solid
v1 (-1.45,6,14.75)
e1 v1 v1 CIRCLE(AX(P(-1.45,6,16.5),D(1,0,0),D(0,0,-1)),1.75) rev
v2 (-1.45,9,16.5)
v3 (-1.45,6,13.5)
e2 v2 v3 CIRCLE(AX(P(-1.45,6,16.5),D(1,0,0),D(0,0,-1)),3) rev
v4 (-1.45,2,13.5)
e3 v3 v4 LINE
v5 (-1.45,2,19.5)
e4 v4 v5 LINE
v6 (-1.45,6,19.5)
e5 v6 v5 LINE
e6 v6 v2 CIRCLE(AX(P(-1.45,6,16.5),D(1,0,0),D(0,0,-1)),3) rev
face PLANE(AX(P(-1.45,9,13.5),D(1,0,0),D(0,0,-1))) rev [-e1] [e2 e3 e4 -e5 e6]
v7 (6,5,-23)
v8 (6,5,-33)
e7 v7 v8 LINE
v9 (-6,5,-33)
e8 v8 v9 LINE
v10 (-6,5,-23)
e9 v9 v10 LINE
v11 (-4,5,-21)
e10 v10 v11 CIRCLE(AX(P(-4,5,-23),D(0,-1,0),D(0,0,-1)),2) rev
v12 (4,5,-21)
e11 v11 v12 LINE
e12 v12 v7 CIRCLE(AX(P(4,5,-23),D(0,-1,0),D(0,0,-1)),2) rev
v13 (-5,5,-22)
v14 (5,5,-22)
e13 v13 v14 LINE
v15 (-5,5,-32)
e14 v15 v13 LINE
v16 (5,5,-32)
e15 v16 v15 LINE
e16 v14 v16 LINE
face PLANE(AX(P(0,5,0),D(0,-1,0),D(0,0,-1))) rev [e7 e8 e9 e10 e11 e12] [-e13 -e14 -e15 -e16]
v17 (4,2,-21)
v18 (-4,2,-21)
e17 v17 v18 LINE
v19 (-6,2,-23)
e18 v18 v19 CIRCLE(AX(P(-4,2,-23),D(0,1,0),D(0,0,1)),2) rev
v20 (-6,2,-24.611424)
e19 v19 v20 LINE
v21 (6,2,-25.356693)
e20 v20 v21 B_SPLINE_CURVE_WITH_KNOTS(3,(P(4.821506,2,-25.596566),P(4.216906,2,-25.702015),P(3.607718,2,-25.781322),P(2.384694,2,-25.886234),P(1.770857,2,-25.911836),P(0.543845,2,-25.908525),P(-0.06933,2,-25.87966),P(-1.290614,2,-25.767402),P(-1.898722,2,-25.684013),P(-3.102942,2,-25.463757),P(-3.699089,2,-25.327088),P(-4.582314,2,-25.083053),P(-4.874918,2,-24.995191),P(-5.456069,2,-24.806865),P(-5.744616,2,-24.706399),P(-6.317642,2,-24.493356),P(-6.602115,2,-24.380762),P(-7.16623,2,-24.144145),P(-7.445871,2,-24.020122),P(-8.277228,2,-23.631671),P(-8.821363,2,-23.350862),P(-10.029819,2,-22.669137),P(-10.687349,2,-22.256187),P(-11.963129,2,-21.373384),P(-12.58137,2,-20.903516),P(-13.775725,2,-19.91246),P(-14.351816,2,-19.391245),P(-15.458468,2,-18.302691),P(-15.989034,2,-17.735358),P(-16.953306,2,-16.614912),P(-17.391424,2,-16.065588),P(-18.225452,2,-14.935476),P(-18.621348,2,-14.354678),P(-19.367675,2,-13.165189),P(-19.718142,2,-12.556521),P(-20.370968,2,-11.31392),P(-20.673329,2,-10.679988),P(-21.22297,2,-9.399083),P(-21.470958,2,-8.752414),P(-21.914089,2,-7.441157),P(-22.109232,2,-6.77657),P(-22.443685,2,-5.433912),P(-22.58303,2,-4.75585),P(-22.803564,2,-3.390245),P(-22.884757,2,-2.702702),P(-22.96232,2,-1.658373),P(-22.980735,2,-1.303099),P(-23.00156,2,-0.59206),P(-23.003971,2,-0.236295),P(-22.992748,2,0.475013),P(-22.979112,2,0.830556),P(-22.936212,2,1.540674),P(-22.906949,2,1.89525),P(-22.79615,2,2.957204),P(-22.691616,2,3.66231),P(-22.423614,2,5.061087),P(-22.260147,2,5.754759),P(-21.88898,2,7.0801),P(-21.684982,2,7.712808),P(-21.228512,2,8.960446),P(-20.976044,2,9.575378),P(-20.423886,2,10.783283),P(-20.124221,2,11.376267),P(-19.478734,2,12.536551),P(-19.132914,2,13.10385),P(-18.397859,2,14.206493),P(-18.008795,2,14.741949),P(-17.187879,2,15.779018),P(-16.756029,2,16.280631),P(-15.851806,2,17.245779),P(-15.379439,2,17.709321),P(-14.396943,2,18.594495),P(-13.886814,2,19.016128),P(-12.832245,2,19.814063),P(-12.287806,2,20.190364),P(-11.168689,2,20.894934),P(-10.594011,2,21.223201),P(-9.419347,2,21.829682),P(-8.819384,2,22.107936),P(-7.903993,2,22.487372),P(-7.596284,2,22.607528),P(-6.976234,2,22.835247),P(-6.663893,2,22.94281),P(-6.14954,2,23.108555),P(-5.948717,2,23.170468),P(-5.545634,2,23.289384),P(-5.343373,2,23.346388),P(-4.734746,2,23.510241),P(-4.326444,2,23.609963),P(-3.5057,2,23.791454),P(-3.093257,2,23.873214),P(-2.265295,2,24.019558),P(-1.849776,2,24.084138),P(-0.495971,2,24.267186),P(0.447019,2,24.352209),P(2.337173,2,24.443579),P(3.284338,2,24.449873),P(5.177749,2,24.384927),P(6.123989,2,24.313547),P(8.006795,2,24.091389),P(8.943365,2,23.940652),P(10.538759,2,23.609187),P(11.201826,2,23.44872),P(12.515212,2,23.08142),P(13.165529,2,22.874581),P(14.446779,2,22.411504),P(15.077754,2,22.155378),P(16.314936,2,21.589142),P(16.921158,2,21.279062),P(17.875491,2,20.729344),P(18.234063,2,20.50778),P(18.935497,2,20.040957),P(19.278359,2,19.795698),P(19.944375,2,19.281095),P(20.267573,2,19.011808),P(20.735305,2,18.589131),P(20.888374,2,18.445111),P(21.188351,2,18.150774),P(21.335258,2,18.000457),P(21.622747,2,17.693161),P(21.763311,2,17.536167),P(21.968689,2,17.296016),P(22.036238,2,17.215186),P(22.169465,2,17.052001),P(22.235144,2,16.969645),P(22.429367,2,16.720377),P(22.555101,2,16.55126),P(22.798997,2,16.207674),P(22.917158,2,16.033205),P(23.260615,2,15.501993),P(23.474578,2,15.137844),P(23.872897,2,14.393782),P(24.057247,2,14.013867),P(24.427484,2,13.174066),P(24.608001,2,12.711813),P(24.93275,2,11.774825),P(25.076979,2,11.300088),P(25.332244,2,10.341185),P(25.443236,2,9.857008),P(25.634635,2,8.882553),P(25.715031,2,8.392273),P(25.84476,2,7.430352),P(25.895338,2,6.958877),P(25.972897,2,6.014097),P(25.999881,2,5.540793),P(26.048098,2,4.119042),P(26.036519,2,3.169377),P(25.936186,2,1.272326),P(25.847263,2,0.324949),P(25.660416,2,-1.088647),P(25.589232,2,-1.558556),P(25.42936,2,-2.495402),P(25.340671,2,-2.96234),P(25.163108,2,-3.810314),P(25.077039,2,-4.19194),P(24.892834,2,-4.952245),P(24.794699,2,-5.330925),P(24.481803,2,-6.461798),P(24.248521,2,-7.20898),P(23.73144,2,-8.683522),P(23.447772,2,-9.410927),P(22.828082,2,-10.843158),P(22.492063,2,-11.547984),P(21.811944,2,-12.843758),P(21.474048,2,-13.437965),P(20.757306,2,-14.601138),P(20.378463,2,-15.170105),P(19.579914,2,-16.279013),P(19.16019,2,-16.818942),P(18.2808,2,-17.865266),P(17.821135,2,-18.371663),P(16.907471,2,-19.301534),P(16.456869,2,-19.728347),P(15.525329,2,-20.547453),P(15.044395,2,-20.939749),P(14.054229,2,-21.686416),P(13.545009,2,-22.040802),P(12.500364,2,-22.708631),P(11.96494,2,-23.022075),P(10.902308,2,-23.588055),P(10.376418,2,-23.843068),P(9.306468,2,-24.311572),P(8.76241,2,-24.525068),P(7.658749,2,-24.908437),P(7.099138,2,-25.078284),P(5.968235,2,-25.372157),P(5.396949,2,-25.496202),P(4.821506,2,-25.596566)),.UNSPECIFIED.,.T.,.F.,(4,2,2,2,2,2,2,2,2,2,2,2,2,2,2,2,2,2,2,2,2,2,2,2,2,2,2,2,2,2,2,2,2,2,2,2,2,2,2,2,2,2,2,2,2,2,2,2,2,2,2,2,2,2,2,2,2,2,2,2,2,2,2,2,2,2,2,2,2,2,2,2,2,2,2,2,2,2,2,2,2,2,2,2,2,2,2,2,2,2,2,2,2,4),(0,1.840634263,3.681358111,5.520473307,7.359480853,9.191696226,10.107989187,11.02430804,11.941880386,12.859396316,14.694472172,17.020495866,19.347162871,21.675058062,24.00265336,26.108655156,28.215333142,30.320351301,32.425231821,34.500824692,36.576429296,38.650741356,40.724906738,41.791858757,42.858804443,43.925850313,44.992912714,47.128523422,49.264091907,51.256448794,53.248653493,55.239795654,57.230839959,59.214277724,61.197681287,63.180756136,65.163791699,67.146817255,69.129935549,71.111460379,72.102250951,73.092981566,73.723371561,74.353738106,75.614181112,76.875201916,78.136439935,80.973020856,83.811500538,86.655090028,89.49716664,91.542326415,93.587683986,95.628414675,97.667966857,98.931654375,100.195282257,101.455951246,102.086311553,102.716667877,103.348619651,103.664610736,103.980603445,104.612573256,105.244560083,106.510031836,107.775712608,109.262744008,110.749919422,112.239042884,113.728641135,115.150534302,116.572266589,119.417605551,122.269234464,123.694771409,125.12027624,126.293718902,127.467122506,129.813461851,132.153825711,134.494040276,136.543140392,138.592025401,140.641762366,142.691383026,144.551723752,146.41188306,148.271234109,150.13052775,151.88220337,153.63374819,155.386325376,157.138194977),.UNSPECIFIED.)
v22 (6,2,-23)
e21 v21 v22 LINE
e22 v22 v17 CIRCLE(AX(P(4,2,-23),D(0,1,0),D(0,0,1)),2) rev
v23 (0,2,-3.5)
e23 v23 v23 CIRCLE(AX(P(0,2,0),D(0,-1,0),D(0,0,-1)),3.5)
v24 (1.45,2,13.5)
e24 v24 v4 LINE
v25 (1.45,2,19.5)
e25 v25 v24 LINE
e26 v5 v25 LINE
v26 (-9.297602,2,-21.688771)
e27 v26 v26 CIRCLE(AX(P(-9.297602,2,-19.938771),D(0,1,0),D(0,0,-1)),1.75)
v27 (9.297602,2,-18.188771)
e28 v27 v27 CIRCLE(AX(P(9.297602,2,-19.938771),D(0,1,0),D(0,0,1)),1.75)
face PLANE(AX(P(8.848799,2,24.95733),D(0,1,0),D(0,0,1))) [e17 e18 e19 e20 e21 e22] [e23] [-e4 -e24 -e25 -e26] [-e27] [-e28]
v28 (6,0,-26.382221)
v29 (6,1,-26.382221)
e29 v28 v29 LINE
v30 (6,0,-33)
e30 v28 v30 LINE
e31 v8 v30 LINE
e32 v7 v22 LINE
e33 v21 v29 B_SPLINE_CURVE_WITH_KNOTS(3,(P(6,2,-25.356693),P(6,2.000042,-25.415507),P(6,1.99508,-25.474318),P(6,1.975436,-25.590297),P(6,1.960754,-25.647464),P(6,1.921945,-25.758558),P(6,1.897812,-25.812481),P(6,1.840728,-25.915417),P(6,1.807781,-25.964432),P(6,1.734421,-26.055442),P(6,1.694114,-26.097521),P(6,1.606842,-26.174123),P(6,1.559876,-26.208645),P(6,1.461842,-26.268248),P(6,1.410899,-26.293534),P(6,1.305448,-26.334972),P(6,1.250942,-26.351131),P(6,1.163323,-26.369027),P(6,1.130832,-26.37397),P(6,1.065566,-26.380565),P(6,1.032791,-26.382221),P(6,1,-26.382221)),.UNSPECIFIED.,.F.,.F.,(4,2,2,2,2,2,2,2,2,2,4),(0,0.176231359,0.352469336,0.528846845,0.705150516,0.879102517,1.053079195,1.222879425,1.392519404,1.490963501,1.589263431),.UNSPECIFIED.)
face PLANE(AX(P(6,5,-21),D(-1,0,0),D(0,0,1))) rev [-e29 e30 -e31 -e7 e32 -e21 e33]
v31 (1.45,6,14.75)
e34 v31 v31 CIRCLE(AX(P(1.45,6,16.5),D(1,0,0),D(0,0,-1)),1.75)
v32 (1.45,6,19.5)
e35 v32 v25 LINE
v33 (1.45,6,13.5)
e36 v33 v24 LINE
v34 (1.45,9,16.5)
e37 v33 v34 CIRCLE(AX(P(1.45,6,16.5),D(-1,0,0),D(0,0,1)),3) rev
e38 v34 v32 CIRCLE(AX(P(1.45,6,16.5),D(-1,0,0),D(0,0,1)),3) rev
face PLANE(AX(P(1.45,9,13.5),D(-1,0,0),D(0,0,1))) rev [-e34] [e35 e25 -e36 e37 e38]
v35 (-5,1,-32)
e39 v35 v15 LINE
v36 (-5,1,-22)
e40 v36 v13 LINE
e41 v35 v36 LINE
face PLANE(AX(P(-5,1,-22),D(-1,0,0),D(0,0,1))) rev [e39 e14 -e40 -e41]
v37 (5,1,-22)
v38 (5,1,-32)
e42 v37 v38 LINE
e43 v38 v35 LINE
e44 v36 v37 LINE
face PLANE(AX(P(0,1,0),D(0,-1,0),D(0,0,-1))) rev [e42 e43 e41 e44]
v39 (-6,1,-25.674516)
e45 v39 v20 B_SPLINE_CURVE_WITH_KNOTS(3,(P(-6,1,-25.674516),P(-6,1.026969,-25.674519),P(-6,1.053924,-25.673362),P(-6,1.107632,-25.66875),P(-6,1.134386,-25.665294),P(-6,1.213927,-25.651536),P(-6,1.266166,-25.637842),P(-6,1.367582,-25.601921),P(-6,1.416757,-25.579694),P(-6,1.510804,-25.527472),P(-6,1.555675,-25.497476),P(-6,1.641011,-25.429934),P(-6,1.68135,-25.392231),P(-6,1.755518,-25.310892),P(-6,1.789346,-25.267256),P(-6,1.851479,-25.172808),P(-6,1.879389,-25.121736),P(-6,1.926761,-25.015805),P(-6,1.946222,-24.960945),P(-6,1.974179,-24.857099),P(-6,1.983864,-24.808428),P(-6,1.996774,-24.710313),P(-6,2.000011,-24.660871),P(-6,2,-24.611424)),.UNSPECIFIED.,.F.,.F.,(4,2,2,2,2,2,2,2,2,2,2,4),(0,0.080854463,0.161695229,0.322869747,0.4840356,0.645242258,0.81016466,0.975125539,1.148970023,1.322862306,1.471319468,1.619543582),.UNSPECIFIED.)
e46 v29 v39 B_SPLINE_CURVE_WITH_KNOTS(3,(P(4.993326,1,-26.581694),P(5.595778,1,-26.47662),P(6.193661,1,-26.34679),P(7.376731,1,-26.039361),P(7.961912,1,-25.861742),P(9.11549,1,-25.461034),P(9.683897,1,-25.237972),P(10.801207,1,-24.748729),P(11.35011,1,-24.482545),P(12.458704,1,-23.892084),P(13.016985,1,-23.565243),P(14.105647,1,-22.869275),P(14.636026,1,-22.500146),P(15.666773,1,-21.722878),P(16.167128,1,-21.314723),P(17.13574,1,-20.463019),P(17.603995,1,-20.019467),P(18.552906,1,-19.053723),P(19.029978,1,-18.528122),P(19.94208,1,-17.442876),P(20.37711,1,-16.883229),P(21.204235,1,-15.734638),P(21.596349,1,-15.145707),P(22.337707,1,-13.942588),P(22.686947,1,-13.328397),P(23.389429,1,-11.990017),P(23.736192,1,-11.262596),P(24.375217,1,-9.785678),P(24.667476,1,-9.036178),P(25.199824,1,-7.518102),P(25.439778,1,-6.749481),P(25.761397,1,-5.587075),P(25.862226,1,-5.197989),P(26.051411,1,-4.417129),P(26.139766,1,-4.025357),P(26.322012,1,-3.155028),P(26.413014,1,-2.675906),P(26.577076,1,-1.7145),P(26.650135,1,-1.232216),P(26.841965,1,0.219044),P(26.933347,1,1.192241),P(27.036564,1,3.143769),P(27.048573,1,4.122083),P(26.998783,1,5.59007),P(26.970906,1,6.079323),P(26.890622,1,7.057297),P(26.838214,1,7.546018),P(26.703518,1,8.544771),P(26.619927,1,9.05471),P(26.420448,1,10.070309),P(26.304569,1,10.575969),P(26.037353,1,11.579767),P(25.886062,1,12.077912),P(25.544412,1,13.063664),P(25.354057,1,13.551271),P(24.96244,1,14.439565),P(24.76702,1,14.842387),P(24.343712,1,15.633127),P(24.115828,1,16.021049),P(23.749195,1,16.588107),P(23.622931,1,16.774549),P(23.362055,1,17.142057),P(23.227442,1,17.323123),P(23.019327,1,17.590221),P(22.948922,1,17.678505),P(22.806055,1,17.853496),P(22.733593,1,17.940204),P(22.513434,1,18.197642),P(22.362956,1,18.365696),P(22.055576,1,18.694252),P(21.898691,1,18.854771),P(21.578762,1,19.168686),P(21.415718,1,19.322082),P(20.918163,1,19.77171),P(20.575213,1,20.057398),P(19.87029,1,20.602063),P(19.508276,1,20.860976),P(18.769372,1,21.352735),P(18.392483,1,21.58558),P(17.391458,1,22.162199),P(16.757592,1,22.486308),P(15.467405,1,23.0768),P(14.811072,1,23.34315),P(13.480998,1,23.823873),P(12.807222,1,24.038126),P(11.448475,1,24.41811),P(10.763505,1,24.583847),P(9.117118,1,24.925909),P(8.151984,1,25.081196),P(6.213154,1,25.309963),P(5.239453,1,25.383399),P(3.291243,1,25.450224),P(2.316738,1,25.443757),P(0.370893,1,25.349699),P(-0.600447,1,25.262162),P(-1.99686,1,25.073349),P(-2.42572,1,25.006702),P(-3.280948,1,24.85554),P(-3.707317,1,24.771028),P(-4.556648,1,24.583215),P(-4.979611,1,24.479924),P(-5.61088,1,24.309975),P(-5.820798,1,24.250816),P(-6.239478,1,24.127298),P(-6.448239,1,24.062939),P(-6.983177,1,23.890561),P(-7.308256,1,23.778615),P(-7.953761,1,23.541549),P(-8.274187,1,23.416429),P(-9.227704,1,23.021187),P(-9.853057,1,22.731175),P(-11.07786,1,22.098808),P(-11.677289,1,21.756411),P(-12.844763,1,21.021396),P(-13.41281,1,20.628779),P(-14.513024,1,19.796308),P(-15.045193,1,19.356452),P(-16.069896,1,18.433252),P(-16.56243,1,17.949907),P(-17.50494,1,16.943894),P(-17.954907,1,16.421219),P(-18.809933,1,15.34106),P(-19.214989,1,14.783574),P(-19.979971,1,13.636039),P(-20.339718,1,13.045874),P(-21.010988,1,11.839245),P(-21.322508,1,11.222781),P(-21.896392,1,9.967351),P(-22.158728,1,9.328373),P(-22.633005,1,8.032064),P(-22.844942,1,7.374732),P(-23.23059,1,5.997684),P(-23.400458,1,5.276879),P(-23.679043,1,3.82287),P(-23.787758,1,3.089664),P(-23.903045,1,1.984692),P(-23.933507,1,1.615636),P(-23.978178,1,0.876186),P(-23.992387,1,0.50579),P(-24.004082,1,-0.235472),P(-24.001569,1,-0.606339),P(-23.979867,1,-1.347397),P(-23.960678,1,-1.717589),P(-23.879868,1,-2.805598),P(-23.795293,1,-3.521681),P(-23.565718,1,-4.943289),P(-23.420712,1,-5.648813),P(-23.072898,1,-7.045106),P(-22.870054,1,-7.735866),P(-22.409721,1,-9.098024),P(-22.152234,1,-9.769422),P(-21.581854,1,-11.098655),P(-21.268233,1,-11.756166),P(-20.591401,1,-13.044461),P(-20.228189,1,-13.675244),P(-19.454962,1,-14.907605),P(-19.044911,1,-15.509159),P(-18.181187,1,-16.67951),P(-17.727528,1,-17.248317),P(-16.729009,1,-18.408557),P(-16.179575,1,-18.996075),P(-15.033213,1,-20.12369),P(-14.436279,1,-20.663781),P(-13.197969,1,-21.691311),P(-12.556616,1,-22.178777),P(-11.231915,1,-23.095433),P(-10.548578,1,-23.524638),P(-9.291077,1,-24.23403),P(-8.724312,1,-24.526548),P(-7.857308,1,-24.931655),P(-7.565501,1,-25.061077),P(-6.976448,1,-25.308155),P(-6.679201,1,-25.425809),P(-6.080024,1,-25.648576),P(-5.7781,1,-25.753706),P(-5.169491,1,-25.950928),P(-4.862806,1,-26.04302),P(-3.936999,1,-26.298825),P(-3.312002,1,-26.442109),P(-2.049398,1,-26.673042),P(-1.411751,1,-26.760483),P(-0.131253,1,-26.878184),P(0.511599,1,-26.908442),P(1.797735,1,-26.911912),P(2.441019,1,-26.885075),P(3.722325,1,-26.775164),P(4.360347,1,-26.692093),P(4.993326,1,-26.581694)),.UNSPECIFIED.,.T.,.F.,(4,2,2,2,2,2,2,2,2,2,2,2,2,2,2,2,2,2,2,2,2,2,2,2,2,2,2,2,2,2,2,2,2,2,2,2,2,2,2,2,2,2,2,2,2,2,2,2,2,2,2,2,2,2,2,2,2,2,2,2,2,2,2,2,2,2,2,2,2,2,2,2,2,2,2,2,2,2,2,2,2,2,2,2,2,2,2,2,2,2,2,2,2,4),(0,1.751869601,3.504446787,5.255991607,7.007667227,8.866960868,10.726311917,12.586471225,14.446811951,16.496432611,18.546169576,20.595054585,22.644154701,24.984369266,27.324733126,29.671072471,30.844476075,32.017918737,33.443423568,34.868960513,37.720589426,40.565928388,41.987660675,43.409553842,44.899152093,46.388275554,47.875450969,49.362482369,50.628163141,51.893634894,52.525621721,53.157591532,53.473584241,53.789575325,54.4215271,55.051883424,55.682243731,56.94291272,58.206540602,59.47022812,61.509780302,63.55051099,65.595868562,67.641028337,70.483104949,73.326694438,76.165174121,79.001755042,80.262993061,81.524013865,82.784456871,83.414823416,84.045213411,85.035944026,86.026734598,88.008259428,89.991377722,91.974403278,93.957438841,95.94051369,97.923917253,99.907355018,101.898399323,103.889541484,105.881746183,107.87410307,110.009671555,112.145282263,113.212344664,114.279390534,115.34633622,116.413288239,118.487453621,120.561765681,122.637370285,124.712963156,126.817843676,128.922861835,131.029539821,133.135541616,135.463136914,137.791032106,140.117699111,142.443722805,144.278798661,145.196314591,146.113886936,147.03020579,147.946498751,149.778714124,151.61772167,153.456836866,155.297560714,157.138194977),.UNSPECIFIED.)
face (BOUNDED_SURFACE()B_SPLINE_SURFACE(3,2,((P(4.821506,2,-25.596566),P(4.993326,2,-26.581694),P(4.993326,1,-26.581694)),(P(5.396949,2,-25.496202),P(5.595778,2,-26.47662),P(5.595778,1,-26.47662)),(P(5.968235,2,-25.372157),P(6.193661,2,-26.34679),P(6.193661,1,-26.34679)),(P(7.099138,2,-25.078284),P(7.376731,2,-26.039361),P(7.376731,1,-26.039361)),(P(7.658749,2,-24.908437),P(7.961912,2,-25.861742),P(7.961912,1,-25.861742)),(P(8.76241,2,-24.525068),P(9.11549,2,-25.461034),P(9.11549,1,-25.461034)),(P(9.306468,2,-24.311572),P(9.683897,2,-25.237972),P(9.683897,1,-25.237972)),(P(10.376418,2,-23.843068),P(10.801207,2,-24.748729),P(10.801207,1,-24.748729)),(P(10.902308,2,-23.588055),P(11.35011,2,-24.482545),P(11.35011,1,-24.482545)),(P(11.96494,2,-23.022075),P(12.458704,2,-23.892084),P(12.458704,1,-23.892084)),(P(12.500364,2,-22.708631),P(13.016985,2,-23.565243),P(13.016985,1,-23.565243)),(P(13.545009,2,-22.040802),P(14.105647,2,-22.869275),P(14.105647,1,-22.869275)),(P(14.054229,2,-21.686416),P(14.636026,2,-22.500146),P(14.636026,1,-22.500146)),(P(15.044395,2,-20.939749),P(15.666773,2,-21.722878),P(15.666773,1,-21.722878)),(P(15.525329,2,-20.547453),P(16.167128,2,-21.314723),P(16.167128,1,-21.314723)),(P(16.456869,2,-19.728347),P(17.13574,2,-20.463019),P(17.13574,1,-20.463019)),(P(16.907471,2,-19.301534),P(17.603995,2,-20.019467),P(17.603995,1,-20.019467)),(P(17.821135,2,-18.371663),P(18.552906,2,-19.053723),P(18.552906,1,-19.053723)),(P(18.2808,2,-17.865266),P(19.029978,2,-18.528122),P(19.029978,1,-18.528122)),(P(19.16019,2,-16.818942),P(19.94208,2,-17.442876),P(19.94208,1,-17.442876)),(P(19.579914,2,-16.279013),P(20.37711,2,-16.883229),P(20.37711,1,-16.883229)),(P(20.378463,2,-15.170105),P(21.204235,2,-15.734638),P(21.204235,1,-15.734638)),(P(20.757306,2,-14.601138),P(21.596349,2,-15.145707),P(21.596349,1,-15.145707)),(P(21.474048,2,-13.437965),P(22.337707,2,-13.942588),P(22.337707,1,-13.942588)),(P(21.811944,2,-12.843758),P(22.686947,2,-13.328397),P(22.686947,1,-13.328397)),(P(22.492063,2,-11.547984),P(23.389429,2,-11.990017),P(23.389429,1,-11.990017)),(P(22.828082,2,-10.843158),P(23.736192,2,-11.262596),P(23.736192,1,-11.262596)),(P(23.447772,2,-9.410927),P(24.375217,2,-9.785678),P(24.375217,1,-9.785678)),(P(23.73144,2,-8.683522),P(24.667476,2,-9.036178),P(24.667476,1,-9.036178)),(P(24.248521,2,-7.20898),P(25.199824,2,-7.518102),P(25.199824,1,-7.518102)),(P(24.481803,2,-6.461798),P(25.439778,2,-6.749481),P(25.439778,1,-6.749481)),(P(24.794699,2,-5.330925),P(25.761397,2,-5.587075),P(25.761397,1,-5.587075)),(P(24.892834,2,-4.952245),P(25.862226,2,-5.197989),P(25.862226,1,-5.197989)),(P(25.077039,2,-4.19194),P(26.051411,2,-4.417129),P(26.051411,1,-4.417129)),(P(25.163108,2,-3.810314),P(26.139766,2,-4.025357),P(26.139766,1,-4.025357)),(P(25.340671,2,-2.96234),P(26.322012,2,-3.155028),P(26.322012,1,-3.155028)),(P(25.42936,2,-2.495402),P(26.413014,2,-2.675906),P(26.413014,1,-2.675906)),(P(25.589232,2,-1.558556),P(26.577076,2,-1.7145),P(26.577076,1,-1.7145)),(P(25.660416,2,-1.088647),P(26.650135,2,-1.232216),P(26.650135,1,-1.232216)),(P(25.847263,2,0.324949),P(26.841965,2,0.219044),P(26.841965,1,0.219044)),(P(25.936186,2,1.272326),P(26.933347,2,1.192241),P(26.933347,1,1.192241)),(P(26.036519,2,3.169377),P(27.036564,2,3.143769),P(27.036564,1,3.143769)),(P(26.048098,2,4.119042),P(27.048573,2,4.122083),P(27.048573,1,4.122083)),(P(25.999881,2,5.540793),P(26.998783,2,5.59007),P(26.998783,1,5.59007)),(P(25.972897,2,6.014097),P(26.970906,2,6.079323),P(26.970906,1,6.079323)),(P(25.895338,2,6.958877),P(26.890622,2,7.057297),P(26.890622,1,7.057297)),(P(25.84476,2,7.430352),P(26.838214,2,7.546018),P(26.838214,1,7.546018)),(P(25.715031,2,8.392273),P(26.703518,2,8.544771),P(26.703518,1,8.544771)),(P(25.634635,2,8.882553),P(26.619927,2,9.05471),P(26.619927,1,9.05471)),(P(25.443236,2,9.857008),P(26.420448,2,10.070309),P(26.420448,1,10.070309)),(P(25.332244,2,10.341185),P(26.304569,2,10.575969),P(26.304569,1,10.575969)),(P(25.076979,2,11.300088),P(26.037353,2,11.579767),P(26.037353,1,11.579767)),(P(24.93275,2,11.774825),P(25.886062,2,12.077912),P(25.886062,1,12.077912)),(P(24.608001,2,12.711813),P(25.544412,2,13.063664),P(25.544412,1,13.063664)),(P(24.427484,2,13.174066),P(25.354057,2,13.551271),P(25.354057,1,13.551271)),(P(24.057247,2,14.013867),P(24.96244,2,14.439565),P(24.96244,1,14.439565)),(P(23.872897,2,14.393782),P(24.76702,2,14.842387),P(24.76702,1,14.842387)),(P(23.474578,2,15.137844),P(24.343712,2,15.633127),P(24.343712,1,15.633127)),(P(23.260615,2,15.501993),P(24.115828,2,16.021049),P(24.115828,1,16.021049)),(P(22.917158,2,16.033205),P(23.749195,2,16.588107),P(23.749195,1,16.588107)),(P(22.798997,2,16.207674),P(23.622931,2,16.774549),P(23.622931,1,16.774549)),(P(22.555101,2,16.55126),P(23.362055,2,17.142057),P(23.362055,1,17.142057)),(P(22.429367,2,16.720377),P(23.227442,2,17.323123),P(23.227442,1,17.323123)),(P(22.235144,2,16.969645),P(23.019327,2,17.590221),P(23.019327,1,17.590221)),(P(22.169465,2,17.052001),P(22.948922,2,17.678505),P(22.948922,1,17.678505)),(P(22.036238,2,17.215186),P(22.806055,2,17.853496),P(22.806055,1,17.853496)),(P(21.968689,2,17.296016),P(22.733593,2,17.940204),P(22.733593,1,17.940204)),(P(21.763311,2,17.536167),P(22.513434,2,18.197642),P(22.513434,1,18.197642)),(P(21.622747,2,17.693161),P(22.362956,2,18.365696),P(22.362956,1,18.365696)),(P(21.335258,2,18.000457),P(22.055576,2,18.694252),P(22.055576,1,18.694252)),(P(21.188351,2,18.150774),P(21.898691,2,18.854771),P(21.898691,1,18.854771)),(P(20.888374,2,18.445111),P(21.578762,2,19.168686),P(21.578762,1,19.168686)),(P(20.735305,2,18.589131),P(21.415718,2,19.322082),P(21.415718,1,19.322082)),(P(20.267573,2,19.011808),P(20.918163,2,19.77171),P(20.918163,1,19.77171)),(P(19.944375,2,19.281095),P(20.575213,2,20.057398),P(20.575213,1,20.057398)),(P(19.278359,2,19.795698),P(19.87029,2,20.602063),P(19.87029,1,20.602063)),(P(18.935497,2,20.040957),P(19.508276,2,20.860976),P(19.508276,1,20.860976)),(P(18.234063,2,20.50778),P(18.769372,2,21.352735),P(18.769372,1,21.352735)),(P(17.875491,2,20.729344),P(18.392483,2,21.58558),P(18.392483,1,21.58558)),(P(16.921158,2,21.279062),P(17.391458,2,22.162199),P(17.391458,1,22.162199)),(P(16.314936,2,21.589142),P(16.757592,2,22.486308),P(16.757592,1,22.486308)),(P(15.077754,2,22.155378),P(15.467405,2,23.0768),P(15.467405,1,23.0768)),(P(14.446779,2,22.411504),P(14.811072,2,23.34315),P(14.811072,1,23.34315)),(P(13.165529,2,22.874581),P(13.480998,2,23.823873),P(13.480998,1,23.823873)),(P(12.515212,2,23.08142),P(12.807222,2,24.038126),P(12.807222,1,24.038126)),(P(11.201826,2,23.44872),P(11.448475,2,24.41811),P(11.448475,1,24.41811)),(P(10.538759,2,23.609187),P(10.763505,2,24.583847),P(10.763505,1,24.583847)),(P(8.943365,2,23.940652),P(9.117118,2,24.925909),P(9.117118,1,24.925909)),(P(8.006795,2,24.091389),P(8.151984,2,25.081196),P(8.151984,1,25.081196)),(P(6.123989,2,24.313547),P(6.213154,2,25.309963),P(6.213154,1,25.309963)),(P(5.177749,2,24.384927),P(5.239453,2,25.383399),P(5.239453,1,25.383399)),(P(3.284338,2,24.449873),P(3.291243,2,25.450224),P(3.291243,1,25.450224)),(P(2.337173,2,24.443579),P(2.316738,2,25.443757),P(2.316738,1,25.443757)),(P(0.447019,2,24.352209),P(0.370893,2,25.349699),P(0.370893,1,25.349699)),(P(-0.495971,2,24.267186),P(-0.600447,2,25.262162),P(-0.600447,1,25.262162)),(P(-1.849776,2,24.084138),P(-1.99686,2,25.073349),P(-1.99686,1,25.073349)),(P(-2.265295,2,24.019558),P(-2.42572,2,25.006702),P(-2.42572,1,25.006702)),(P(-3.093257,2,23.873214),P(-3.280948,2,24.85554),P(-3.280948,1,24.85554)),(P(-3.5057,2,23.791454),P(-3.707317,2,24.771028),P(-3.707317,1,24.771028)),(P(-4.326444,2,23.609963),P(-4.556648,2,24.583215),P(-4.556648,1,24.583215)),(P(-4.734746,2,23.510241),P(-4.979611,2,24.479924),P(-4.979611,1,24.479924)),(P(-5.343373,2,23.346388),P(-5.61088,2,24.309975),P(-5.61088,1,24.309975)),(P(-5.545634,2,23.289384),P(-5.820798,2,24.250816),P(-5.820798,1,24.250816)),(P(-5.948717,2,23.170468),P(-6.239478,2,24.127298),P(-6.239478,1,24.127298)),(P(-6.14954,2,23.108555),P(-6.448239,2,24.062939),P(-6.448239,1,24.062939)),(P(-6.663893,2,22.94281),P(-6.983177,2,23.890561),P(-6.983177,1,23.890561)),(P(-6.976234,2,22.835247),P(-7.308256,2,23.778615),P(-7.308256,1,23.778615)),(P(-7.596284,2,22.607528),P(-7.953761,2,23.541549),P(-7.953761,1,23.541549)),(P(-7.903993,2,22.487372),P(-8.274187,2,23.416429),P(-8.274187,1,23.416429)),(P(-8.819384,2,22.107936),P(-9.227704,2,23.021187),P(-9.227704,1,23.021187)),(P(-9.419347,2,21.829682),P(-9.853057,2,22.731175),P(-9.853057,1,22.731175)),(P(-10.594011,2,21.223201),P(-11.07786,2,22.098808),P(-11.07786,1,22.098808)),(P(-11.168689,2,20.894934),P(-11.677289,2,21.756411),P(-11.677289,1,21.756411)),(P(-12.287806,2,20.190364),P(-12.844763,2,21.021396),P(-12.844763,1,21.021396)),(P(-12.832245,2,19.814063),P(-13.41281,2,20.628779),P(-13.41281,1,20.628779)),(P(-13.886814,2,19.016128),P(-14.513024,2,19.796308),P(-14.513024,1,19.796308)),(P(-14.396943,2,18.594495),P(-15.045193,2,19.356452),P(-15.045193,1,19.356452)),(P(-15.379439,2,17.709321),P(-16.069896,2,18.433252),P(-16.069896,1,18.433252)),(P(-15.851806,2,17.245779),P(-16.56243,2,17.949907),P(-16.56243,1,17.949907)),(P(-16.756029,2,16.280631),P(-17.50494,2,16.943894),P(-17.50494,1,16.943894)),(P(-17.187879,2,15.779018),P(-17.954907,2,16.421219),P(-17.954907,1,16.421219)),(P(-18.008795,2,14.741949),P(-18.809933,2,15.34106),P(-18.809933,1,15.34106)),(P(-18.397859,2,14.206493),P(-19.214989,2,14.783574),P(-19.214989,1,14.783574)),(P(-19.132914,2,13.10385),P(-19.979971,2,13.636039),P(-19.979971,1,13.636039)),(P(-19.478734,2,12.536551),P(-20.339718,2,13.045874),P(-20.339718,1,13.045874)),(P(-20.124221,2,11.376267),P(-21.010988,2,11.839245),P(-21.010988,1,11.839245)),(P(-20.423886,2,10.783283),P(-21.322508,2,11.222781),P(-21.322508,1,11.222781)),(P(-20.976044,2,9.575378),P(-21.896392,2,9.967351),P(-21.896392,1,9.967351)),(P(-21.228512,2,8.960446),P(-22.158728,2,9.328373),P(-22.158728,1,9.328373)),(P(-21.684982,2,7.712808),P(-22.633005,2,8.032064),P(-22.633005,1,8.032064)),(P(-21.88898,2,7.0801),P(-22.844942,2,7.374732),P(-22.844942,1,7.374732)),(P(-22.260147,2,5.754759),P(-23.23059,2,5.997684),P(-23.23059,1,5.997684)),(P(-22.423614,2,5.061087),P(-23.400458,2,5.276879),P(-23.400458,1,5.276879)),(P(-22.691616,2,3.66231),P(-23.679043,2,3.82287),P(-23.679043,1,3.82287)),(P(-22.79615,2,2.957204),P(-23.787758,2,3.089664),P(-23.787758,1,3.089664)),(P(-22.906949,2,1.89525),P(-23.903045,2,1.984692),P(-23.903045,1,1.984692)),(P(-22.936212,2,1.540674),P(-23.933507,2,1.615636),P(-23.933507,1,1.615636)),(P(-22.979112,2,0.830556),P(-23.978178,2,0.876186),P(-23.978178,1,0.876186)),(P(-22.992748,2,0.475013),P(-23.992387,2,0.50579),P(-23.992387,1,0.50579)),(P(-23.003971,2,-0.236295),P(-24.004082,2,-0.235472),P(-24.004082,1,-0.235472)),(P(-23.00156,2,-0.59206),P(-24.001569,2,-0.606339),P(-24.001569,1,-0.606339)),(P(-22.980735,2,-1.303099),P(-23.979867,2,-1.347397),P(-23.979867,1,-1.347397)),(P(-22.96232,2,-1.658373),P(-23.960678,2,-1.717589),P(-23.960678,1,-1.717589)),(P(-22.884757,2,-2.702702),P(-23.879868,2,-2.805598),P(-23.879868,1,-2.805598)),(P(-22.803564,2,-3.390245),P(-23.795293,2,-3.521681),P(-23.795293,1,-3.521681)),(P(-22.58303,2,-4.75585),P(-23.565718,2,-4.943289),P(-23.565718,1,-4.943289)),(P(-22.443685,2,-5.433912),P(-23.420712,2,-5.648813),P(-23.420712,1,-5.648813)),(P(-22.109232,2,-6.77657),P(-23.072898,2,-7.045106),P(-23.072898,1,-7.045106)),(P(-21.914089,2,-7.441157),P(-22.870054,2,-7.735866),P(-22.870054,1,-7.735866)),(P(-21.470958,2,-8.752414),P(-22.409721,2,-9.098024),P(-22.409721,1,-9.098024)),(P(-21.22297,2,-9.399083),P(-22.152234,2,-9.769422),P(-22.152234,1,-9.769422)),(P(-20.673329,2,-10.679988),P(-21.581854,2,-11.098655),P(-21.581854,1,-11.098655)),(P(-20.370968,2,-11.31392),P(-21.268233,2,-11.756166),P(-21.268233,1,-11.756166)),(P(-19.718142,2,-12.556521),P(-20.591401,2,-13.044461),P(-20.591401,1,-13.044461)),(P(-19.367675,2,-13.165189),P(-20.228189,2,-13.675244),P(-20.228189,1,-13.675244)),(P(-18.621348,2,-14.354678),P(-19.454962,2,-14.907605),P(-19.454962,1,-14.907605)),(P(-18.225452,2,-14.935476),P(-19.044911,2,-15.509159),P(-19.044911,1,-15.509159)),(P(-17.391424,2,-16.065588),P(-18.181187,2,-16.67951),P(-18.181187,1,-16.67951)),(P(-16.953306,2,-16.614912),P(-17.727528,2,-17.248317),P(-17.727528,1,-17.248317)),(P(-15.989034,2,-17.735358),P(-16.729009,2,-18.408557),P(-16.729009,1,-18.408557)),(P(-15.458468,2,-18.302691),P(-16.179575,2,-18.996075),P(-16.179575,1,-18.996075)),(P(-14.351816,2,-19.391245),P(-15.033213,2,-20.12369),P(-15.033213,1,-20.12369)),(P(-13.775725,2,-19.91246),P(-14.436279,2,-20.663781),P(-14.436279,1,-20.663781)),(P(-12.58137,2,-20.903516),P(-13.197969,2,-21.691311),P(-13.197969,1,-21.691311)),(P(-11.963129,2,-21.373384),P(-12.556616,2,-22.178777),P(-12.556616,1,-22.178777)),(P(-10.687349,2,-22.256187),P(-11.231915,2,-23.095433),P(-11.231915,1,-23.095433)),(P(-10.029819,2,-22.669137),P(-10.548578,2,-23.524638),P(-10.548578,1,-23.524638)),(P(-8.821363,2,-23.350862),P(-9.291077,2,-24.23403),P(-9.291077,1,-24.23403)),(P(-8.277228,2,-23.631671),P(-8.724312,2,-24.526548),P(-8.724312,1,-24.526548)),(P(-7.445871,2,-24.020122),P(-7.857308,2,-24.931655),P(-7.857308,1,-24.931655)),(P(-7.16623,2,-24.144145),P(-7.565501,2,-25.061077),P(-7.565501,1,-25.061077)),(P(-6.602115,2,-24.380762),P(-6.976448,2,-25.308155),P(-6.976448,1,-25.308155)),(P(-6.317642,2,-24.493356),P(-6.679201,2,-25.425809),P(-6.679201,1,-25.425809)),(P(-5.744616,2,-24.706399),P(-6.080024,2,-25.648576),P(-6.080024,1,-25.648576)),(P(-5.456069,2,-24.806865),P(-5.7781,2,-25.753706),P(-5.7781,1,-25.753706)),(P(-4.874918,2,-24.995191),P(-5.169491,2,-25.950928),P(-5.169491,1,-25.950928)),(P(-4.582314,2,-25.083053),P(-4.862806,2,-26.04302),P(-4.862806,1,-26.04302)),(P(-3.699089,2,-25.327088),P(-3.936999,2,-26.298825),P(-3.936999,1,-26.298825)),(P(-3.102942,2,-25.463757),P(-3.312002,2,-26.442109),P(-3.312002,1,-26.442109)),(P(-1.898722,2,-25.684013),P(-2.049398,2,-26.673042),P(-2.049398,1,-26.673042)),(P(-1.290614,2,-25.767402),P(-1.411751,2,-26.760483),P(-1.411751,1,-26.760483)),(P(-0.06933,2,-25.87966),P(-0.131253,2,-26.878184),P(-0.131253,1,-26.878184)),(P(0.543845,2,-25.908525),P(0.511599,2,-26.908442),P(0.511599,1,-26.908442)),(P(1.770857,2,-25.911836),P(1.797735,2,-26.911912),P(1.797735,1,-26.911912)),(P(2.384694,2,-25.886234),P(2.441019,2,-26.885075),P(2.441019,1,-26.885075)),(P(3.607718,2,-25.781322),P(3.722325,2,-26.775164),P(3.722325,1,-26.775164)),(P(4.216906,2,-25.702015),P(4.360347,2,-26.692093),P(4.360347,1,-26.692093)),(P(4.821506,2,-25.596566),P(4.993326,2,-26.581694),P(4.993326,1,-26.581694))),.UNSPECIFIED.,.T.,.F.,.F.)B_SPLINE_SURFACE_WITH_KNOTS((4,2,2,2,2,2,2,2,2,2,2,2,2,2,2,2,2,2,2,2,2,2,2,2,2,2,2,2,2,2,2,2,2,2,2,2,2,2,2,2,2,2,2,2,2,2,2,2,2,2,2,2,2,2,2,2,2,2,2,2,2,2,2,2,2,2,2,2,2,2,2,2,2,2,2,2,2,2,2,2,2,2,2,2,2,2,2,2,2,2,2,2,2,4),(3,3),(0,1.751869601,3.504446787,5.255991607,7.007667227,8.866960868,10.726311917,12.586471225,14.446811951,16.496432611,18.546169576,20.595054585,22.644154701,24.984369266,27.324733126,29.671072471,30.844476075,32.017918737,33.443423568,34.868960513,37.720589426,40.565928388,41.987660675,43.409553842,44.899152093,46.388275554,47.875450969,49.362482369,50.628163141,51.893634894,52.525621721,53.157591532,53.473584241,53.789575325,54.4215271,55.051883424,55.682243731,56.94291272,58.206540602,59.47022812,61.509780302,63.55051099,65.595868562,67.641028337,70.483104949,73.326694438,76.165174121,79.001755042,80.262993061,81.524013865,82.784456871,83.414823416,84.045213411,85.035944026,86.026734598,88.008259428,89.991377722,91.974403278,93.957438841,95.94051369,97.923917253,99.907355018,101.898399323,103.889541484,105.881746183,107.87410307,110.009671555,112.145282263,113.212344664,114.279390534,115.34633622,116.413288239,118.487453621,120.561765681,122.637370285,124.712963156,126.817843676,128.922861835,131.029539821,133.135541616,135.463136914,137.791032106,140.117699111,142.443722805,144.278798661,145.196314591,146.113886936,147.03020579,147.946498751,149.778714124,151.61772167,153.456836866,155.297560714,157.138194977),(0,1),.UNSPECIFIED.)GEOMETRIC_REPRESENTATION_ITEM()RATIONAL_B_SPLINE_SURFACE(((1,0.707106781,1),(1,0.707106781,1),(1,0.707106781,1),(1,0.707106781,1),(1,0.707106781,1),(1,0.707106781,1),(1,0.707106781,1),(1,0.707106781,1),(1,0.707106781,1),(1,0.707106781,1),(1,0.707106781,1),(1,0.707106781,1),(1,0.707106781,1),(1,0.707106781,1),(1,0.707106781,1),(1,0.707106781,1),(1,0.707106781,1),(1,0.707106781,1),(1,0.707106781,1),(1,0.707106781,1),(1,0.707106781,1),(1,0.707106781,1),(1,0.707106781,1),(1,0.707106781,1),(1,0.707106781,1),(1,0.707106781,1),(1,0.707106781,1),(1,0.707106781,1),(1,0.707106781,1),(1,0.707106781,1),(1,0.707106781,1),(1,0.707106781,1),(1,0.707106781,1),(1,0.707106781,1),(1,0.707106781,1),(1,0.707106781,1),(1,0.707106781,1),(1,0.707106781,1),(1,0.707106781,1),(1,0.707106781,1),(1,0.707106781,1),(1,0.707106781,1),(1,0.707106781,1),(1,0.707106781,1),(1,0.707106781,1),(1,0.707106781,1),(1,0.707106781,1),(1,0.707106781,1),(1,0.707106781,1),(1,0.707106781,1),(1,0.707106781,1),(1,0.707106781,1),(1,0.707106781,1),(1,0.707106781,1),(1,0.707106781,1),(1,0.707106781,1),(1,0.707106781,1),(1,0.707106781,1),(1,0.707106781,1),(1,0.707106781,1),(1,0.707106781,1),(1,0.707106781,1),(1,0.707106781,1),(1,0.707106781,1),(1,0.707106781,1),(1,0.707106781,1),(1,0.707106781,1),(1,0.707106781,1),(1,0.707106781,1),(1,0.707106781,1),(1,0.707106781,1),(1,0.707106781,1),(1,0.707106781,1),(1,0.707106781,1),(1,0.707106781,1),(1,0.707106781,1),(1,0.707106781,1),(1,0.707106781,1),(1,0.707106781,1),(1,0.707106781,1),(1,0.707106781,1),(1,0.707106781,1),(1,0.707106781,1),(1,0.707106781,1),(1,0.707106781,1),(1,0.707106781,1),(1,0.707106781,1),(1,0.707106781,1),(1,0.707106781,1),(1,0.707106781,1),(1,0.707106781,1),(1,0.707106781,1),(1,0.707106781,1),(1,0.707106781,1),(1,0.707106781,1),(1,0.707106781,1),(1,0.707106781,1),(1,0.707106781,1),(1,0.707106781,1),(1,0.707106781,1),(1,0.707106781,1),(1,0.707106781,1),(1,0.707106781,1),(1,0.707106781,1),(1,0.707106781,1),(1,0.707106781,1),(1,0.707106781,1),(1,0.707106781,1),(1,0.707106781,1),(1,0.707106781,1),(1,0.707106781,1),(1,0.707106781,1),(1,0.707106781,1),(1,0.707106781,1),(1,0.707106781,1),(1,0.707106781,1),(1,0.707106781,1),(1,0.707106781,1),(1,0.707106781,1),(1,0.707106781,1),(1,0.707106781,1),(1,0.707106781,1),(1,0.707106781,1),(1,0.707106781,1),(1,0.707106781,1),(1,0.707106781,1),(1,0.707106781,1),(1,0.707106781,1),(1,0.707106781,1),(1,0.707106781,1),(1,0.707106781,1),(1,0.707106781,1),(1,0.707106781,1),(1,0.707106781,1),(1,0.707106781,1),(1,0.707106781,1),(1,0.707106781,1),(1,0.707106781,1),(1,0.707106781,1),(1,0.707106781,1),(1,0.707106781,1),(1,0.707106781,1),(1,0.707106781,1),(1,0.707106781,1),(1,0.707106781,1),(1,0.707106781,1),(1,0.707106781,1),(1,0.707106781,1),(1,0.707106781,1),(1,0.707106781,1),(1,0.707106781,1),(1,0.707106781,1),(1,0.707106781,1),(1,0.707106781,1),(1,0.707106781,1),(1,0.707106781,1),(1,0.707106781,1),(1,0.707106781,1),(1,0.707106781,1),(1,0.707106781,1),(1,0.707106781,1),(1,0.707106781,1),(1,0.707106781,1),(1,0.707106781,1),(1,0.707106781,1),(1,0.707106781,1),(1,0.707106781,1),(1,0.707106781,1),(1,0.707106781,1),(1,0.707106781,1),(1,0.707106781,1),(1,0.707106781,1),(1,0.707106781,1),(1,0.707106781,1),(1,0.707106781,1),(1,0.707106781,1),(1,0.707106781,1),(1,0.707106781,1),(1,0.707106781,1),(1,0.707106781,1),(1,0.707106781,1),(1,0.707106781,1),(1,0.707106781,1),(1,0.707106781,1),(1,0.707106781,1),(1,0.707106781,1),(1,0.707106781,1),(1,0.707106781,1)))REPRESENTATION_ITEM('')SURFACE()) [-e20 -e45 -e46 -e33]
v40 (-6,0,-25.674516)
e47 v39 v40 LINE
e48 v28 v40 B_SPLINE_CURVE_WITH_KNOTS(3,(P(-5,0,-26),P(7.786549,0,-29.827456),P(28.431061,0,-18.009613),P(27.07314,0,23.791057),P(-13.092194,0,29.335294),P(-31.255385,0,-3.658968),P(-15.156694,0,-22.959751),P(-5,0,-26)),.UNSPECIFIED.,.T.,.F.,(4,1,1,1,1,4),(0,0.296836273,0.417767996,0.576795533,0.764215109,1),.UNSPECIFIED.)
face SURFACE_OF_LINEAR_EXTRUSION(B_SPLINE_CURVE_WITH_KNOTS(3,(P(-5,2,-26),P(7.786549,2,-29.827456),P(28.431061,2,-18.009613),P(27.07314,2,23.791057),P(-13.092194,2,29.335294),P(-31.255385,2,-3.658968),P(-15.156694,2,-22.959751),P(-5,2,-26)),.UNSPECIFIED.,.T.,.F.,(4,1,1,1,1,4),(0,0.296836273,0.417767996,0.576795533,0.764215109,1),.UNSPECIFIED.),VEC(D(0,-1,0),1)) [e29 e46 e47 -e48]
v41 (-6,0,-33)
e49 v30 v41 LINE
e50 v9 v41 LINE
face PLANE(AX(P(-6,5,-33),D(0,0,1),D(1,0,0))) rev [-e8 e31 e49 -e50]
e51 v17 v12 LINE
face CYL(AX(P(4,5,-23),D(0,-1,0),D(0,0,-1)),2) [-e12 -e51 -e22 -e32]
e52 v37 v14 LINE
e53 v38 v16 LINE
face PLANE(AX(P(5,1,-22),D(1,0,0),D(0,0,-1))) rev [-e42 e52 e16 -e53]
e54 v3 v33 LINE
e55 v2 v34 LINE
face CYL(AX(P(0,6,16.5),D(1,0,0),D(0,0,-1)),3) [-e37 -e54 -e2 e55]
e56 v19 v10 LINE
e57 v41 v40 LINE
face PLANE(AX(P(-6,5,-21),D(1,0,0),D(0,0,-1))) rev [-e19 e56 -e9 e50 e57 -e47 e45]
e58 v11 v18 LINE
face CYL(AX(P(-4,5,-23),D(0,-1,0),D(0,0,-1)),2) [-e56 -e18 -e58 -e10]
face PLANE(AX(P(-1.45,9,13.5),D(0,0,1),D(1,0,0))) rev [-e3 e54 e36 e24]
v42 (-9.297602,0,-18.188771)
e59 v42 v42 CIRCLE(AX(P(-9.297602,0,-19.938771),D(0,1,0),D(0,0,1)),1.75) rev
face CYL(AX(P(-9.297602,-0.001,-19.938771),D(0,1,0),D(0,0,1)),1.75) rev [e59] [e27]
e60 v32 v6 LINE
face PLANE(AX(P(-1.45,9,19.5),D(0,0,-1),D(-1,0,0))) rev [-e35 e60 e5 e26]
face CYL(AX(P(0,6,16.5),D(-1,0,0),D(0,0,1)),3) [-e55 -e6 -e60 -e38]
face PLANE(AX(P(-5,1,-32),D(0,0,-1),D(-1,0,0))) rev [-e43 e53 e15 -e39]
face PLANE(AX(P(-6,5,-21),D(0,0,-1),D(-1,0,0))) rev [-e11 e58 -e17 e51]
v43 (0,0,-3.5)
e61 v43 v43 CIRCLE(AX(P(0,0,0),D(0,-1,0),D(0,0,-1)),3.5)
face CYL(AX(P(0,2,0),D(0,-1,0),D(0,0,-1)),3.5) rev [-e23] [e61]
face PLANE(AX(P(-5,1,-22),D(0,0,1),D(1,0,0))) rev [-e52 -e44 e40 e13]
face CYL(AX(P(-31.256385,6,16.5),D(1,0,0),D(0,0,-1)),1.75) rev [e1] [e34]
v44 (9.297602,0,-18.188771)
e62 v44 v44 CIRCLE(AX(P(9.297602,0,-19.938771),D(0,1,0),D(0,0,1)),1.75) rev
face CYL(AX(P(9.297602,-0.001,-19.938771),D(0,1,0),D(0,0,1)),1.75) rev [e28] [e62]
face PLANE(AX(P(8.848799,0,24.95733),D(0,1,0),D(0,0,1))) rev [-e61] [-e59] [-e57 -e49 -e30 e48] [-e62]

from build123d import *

# Parameters (mm, degrees)
BOSS_EXTRUDE1_DEPTH = 2
SKETCH53_R          = 3.5
CUT_EXTRUDE1_DEPTH  = 39.196778302
CUT_EXTRUDE2_REACH  = 40.197
SKETCH54_R          = 1.75
SKETCH58_W          = 2.9
SKETCH58_H          = 6
BOSS_EXTRUDE3_DEPTH = 7
CUT_EXTRUDE5_REACH  = 40.206
SKETCH59_R          = 1.75
FILLET2_R           = 3
SKETCH62_W          = 12
SKETCH62_H          = 12
BOSS_EXTRUDE5_DEPTH = 5
SKETCH63_W          = 10
SKETCH63_H          = 10
CUT_EXTRUDE6_DEPTH  = 4
FILLET4_R           = 2
FILLET5_R           = 1


with BuildPart() as part:
    # Sketch1 → Boss-Extrude1 (new body)
    with BuildSketch(Plane.XZ):
        with BuildLine():
            add(Edge.make_bspline(
                [(-5, -26), (7.786549371, -29.827455575), (28.431061215, -18.009613356), (27.073140257, 23.791056835), (-13.092194035, 29.335293652), (-31.25538501, -3.658967579), (-15.156693843, -22.959750959), (-5, -26)],
                knots=[0, 0, 0, 0, 0.296836273, 0.417767996, 0.576795533, 0.764215109, 1, 1, 1, 1], degree=3))
        make_face()
    extrude(amount=-BOSS_EXTRUDE1_DEPTH)

    # Sketch53 → Cut-Extrude1 (cut, through all)
    with BuildSketch(Plane.XZ):
        with Locations(Location((0, 0, 0), (0, 0, 270))):
            Circle(SKETCH53_R)
    extrude(amount=-CUT_EXTRUDE1_DEPTH, mode=Mode.SUBTRACT)

    # Sketch54 → Cut-Extrude2 (cut, up to next)
    with BuildSketch(Plane(origin=(0, 2, 0), x_dir=(1, 0, 0), z_dir=(0, 1, 0)), mode=Mode.PRIVATE) as cut_extrude2_sk1:
        with Locations(Location((9.297601758, 19.938771315, 0), (0, 0, 270))):
            Circle(SKETCH54_R)
    cut_extrude2_tool1 = extrude(cut_extrude2_sk1.sketch, amount=-CUT_EXTRUDE2_REACH, mode=Mode.PRIVATE) & part.part
    # Sketch54 → Cut-Extrude2 (cut, up to next)
    with BuildSketch(Plane(origin=(0, 2, 0), x_dir=(1, 0, 0), z_dir=(0, 1, 0)), mode=Mode.PRIVATE) as cut_extrude2_sk2:
        with Locations(Location((-9.297601758, 19.938771315, 0), (0, 0, 270))):
            Circle(SKETCH54_R)
    cut_extrude2_tool2 = extrude(cut_extrude2_sk2.sketch, amount=-CUT_EXTRUDE2_REACH, mode=Mode.PRIVATE) & part.part
    add(cut_extrude2_tool1.solids().sort_by_distance((9.297602, 2, -19.938771))[0], mode=Mode.SUBTRACT)
    add(cut_extrude2_tool2.solids().sort_by_distance((-9.297602, 2, -19.938771))[0], mode=Mode.SUBTRACT)

    # Sketch58 → Boss-Extrude3 (add)
    with BuildSketch(Plane(origin=(0, 2, 0), x_dir=(1, 0, 0), z_dir=(0, 1, 0))):
        with Locations((0, -16.5)):
            Rectangle(SKETCH58_W, SKETCH58_H)
    extrude(amount=BOSS_EXTRUDE3_DEPTH)

    # Sketch59 → Cut-Extrude5 (cut, up to next)
    with BuildSketch(Plane(origin=(1.45, 0, 0), x_dir=(0, 0, -1), z_dir=(1, 0, 0)), mode=Mode.PRIVATE) as cut_extrude5_sk1:
        with Locations((-16.5, 6)):
            Circle(SKETCH59_R)
    cut_extrude5_tool1 = extrude(cut_extrude5_sk1.sketch, amount=-CUT_EXTRUDE5_REACH, mode=Mode.PRIVATE) & part.part
    add(cut_extrude5_tool1.solids().sort_by_distance((1.45, 6, 16.5))[0], mode=Mode.SUBTRACT)

    # Fillet2
    fillet2_edges = [part.edges().sort_by_distance(p)[0] for p in [
        (0, 9, 13.5),
        (0, 9, 19.5),
    ]]
    fillet(fillet2_edges, radius=FILLET2_R - 0.0001)  # a hair under: the kernel refuses the full size

    # Sketch62 → Boss-Extrude5 (add)
    with BuildSketch(Plane(origin=(0, 0, 0), x_dir=(1, 0, 0), z_dir=(0, 1, 0))):
        with Locations((0, 27)):
            Rectangle(SKETCH62_W, SKETCH62_H)
    extrude(amount=BOSS_EXTRUDE5_DEPTH)

    # Sketch63 → Cut-Extrude6 (cut)
    with BuildSketch(Plane(origin=(0, 5, 0), x_dir=(1, 0, 0), z_dir=(0, 1, 0))):
        with Locations((0, 27)):
            Rectangle(SKETCH63_W, SKETCH63_H)
    extrude(amount=-CUT_EXTRUDE6_DEPTH, mode=Mode.SUBTRACT)

    # Fillet4
    fillet4_edges = [part.edges().sort_by_distance(p)[0] for p in [
        (6, 3.5, -21),
        (-6, 3.5, -21),
    ]]
    fillet(fillet4_edges, radius=FILLET4_R)

    # Fillet5
    fillet5_edges = [part.edges().sort_by_distance(p)[0] for p in [
        (3.875911824, 2, 25.42804335),
    ]]
    fillet(fillet5_edges, radius=FILLET5_R)


solid = part.part
